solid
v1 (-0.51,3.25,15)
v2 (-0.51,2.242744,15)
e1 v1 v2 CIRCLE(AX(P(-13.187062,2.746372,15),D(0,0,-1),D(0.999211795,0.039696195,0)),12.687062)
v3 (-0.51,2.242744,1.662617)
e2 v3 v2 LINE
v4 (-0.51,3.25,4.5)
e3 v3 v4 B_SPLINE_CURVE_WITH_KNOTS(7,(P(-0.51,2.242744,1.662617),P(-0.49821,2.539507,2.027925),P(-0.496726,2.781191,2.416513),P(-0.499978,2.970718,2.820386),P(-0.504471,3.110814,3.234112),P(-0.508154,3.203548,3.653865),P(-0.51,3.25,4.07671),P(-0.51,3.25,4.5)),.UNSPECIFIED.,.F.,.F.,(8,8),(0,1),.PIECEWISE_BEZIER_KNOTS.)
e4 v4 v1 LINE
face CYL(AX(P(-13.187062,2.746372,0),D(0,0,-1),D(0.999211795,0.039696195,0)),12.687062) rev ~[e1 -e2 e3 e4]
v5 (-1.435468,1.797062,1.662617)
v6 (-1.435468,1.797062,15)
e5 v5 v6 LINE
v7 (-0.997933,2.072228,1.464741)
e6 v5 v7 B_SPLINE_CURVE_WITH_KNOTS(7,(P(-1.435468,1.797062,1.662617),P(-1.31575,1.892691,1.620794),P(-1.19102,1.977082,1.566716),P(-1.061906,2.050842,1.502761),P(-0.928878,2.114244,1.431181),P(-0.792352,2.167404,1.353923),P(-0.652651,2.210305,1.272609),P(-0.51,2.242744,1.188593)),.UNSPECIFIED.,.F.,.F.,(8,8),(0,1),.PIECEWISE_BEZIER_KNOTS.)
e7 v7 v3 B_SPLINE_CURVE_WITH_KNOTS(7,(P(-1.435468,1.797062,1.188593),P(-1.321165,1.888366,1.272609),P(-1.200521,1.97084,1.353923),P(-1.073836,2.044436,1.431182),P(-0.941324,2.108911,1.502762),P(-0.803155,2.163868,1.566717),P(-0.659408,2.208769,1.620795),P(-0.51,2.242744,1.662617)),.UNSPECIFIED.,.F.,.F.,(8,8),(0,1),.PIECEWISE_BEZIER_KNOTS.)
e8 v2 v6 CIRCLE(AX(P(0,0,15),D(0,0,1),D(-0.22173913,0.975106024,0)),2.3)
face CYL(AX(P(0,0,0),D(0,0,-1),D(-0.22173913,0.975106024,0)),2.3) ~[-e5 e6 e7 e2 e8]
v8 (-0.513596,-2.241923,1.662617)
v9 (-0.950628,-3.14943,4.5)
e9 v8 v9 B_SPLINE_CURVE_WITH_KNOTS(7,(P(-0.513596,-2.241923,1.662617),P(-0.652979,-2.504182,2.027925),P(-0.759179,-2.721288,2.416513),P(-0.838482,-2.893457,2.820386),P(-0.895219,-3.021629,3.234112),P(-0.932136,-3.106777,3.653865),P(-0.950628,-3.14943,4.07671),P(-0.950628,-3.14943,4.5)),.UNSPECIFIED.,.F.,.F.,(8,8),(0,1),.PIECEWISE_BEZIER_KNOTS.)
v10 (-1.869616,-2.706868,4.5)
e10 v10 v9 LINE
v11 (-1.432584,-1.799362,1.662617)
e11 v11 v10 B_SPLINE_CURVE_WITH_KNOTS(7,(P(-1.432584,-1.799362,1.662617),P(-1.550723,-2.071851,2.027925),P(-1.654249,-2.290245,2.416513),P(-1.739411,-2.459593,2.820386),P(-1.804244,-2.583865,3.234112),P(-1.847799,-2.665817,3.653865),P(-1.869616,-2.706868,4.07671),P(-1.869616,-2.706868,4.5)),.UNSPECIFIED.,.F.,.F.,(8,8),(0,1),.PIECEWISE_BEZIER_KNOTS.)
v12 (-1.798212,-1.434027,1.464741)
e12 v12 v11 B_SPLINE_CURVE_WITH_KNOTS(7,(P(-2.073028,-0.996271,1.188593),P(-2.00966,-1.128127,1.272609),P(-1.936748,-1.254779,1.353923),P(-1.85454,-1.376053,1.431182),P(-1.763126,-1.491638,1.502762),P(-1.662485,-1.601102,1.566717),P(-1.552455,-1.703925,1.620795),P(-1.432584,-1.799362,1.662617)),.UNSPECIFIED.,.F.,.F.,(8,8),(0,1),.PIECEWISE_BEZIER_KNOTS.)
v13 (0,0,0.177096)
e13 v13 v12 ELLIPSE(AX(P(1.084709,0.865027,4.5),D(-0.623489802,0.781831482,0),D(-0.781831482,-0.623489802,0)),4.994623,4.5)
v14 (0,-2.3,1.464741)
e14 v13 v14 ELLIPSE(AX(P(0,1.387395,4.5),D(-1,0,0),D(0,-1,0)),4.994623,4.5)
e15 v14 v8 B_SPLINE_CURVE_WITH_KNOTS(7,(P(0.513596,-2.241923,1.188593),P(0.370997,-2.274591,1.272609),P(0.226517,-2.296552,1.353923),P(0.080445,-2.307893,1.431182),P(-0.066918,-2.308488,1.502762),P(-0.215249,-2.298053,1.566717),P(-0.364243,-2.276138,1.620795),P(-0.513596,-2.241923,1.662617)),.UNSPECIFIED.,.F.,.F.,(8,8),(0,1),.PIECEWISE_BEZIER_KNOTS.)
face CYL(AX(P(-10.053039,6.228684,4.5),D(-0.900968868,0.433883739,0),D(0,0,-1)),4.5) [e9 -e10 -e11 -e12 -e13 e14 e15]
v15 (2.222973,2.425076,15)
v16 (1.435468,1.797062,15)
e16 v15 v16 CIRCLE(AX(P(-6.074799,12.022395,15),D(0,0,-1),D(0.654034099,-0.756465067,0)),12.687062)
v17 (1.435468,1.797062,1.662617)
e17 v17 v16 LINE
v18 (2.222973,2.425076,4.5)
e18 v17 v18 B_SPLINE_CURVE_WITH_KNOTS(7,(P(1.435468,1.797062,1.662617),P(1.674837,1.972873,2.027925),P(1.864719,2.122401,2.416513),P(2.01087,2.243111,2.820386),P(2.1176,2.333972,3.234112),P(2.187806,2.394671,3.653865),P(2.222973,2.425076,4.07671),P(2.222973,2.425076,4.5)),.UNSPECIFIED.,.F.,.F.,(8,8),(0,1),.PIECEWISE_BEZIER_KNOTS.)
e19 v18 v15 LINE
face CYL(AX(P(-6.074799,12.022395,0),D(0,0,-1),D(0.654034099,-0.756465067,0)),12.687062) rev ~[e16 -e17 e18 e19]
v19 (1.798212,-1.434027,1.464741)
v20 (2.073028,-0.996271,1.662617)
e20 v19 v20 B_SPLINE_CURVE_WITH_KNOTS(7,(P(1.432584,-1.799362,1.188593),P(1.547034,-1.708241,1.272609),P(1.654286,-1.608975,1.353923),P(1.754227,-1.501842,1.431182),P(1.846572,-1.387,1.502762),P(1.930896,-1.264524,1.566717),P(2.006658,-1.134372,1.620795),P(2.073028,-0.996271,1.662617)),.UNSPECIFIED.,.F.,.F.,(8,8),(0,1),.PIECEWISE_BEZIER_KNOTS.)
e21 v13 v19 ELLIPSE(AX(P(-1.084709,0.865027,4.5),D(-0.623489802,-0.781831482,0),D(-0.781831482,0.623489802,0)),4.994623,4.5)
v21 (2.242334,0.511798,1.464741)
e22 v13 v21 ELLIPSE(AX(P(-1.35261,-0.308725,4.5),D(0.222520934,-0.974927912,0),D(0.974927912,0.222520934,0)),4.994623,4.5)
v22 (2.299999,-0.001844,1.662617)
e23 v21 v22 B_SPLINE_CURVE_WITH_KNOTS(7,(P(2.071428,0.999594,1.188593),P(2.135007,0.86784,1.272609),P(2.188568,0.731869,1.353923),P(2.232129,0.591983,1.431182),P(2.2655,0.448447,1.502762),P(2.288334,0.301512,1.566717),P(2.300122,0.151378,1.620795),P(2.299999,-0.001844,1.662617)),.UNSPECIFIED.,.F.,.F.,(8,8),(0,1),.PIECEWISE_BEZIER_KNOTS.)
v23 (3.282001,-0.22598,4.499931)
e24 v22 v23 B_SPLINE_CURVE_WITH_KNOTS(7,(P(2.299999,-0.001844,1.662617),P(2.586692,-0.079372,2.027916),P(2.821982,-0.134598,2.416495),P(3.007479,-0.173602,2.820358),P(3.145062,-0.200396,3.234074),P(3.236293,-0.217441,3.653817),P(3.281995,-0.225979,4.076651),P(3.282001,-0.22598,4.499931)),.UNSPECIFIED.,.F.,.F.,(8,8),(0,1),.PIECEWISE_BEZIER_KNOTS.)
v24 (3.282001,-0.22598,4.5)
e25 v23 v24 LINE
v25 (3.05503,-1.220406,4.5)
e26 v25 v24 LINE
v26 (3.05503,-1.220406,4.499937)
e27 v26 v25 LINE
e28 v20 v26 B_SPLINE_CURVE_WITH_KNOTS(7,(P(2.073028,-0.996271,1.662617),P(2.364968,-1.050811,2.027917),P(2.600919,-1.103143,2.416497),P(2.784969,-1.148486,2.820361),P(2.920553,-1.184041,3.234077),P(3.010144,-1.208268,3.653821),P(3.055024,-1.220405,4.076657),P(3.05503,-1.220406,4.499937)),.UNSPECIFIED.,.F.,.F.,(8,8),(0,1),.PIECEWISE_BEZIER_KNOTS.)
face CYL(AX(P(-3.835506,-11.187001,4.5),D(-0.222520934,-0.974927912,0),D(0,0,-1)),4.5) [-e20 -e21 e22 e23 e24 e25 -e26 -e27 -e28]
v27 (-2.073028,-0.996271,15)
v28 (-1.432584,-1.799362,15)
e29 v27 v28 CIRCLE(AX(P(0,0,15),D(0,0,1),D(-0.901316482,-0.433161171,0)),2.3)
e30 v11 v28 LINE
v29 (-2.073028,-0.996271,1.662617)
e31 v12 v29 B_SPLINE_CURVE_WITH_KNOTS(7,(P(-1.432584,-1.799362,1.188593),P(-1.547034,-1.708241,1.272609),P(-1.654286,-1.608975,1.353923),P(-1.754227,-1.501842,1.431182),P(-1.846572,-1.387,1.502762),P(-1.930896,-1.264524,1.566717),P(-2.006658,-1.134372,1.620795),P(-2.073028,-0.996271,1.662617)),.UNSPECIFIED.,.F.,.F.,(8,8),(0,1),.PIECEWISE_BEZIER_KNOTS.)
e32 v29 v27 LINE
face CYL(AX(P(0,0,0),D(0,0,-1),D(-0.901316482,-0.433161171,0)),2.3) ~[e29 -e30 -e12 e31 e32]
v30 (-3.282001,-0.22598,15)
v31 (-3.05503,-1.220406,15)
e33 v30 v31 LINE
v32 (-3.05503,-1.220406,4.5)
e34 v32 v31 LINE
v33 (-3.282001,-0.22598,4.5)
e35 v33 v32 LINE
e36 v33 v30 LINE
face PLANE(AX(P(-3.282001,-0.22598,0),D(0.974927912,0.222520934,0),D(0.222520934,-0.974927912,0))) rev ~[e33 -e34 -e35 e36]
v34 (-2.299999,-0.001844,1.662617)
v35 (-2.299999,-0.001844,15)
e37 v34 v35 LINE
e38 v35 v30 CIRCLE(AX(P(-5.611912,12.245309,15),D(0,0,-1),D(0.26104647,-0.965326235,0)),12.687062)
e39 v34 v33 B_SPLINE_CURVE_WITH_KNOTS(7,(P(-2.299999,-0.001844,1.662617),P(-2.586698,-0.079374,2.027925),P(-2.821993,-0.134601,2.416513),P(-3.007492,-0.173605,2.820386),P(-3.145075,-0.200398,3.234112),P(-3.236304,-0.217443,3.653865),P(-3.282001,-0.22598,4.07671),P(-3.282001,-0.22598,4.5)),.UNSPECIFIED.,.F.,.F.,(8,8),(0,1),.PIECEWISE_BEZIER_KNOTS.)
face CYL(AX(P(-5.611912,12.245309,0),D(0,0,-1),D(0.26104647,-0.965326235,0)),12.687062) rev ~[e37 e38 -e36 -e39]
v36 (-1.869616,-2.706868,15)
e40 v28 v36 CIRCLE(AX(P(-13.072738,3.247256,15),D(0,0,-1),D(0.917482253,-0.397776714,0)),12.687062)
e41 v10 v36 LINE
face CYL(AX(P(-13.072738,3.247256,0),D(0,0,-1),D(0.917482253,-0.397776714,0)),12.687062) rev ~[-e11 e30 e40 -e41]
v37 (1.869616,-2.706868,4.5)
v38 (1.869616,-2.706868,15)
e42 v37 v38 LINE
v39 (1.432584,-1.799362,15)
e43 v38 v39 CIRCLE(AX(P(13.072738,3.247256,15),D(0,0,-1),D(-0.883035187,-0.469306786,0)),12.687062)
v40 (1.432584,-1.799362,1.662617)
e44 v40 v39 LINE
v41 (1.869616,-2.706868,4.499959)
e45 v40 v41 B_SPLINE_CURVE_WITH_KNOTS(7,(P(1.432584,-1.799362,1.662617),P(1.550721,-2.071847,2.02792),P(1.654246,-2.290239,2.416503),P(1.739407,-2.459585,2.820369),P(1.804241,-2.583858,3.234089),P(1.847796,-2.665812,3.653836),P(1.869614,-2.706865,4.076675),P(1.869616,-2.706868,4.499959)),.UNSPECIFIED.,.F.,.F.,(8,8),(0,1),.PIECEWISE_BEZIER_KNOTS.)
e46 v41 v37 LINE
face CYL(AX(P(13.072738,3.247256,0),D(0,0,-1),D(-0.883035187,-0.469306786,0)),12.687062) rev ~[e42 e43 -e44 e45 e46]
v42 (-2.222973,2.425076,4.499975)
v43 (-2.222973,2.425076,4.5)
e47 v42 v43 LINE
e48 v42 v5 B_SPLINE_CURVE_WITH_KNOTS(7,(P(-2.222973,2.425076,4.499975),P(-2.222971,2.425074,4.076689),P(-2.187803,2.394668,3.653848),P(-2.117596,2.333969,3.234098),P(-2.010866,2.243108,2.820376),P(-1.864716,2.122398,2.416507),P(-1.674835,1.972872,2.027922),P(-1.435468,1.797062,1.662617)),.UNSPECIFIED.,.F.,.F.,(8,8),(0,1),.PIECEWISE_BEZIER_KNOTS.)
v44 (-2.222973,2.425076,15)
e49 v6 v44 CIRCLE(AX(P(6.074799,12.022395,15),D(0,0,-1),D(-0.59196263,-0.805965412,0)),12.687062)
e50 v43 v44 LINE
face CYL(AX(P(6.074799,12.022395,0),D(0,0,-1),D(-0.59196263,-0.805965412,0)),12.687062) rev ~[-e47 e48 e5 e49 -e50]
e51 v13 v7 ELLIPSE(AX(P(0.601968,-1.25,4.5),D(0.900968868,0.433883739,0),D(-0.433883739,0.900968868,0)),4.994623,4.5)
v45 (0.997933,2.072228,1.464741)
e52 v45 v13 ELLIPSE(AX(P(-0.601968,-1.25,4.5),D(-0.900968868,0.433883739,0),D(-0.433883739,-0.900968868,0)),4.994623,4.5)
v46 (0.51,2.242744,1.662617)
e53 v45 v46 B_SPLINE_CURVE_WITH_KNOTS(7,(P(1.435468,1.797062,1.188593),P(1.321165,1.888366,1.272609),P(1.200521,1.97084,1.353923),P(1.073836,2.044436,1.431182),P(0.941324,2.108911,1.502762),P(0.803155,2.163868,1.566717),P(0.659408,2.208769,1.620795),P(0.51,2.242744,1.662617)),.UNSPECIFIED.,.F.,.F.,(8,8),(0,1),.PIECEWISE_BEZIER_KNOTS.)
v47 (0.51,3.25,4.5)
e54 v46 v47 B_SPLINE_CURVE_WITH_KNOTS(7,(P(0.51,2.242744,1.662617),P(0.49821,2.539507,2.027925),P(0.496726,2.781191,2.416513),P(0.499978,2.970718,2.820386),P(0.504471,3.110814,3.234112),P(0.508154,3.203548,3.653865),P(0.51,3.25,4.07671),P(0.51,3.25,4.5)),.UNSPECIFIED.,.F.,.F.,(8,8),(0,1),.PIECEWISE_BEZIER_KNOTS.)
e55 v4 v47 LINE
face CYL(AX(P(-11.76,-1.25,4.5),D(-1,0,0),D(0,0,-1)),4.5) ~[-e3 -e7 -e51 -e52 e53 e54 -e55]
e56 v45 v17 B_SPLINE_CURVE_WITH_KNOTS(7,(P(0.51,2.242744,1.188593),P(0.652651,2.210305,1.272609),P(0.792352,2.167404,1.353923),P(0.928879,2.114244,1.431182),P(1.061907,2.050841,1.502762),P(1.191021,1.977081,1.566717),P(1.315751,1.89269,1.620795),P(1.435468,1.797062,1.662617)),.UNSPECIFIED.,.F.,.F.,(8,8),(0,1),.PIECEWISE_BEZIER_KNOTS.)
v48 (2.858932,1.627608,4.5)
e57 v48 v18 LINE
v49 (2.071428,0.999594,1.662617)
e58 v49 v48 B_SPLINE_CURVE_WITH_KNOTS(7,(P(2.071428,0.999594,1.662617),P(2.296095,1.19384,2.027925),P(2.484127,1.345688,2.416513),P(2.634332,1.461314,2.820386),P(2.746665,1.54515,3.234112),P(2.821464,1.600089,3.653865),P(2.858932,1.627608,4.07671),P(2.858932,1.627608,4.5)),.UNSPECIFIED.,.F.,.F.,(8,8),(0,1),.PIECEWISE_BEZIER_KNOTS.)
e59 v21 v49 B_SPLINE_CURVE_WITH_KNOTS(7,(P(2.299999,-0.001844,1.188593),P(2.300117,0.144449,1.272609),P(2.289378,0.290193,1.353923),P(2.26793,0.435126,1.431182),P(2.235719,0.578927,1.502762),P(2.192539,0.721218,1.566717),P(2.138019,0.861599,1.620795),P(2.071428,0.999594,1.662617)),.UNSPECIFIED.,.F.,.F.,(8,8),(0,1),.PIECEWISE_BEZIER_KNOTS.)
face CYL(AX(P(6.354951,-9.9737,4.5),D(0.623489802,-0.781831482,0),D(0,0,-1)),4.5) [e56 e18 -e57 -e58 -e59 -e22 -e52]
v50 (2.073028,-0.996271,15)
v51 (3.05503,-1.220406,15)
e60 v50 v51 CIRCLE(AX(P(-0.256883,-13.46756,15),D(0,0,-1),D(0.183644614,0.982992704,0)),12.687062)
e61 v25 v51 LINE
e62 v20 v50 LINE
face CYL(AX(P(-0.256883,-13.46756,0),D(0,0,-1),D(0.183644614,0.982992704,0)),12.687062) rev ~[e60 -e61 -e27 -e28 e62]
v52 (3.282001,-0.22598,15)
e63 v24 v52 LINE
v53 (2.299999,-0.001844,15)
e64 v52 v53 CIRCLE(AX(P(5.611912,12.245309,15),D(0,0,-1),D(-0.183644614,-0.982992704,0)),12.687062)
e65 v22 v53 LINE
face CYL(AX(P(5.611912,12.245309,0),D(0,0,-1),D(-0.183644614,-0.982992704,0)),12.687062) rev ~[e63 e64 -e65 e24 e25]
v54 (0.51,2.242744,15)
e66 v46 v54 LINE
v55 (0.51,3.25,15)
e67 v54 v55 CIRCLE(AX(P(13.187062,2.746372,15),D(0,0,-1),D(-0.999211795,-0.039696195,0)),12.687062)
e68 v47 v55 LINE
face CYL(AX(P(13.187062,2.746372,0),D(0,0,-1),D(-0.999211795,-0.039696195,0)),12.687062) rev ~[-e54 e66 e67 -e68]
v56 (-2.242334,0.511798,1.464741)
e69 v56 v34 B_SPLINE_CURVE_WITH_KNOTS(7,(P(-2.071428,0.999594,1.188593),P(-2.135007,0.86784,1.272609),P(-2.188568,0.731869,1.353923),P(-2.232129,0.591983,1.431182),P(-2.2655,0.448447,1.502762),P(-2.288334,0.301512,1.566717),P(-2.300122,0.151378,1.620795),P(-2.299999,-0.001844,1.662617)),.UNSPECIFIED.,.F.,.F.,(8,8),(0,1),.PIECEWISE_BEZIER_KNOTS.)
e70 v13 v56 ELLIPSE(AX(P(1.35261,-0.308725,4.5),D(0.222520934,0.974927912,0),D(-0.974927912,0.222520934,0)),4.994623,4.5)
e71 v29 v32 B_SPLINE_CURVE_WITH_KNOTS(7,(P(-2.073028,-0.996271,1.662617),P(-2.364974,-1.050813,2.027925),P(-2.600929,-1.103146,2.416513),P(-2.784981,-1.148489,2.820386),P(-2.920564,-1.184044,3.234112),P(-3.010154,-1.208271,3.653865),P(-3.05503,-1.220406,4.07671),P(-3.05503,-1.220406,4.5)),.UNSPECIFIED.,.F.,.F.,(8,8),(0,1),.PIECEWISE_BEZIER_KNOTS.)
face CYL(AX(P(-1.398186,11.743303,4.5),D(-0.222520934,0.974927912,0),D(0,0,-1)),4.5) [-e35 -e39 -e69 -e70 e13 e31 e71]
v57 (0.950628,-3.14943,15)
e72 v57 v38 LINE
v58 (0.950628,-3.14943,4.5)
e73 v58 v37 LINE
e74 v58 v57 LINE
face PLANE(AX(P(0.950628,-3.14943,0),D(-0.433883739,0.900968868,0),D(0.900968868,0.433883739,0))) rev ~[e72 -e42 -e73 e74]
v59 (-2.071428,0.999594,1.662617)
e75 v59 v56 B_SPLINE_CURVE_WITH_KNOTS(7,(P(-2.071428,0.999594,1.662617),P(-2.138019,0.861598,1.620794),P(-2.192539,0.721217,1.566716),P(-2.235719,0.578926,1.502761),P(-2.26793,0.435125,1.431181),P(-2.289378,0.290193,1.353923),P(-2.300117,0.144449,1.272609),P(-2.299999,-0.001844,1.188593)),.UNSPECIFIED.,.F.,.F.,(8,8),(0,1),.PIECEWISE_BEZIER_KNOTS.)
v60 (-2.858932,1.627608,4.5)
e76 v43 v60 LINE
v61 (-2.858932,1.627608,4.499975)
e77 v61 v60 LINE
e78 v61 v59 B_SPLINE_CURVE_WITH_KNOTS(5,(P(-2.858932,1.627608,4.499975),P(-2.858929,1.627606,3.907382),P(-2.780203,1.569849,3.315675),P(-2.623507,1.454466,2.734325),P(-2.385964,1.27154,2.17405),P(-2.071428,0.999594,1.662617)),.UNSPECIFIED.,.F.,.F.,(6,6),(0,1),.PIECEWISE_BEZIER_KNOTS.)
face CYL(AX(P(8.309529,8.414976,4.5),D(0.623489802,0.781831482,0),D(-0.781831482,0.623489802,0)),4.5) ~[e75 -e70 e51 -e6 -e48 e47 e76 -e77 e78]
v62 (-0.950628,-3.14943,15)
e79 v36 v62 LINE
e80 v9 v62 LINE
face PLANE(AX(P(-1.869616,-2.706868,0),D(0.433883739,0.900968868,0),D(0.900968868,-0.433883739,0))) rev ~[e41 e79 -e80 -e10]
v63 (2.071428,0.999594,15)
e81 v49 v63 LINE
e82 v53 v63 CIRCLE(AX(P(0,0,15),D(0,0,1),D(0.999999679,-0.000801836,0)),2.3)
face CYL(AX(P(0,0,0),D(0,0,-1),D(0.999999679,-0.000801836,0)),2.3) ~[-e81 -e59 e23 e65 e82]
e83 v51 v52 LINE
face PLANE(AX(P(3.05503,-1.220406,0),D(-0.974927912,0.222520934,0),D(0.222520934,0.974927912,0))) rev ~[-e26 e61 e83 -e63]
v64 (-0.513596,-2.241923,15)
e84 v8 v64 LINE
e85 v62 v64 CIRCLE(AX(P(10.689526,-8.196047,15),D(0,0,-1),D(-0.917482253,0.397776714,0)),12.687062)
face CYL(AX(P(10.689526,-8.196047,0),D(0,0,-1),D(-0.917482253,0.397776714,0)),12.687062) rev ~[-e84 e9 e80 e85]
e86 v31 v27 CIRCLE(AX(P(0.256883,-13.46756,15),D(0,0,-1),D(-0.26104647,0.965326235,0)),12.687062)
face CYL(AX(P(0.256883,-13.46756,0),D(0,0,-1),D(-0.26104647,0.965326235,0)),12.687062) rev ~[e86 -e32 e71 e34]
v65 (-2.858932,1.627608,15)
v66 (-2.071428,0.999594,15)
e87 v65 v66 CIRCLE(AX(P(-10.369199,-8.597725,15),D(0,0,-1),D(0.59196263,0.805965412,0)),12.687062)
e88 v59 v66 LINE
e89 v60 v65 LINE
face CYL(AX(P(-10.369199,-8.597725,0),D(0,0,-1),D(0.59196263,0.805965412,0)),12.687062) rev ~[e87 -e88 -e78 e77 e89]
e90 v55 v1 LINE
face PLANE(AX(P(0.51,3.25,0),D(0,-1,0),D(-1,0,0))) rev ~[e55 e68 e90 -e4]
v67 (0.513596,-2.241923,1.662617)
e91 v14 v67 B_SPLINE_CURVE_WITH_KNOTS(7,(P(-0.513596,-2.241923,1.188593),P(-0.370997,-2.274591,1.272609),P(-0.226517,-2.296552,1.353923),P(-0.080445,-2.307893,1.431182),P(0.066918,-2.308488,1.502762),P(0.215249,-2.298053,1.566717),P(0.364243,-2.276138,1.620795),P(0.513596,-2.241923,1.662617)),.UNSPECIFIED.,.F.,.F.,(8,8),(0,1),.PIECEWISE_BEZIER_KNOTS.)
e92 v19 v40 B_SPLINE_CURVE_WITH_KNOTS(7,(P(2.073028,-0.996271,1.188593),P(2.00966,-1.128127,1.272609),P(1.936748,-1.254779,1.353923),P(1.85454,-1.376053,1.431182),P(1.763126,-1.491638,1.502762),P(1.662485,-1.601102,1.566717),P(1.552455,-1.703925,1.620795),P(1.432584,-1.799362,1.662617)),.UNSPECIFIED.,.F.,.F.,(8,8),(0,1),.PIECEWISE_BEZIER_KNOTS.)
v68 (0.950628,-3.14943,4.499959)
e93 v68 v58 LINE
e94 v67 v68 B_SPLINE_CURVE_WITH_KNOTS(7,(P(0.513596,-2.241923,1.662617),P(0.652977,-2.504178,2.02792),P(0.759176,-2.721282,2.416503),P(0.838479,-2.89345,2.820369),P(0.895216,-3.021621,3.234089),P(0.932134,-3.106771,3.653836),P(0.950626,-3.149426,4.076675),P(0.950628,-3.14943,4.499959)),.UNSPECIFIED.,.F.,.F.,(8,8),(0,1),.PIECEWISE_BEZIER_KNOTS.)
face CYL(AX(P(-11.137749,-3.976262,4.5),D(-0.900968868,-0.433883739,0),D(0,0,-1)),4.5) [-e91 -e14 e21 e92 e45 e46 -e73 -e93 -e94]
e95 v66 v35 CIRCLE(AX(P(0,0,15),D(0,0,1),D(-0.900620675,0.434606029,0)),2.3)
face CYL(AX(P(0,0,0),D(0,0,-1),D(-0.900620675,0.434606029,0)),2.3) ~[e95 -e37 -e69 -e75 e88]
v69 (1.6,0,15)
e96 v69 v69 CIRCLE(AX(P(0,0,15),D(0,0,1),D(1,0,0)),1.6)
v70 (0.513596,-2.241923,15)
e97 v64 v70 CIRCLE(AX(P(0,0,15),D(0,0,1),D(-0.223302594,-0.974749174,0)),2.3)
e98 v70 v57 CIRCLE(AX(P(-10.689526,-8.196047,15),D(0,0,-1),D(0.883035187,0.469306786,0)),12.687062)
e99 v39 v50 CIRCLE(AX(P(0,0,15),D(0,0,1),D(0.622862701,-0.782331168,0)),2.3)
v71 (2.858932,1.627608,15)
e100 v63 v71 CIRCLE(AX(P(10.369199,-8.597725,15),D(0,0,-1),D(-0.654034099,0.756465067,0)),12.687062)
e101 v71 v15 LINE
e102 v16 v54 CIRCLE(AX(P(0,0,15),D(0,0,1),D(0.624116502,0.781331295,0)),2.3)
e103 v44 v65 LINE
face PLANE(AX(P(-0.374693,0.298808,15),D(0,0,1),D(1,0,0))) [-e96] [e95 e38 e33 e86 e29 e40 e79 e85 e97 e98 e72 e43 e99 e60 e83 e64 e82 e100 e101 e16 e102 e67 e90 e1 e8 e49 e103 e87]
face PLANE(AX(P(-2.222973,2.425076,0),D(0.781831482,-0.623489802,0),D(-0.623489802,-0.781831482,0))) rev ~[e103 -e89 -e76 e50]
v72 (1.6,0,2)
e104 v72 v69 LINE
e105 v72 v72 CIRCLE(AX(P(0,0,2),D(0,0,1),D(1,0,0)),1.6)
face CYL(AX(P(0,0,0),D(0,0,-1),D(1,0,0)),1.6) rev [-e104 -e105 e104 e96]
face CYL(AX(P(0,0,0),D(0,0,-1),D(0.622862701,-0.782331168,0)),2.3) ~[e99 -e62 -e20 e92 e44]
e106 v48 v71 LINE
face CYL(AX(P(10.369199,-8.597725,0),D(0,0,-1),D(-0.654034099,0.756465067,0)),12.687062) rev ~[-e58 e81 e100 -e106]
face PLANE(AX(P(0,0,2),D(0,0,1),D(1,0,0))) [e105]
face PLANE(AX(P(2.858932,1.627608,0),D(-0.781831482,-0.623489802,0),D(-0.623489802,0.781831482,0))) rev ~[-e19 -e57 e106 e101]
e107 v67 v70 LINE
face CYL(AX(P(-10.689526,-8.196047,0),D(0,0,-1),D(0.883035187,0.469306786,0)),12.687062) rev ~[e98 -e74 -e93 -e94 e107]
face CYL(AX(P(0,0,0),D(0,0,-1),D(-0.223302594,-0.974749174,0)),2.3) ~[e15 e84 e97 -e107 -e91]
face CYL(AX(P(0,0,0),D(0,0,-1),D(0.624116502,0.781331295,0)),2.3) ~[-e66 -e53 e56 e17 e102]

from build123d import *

# Parameters (mm, degrees)
F0_R         = 1.6
F1_DEPTH     = 15
F2_DEPTH     = 2
F3_T1_DEPTH  = 23.52
F3_T3_DEPTH  = 23.52
F3_T5_DEPTH  = 23.52
F3_T7_DEPTH  = 23.52
F3_T9_DEPTH  = 23.52
F3_T11_DEPTH = 23.52
F3_T13_DEPTH = 23.52


# Not quite as in the source:
# - a fillet or chamfer that OpenCascade refuses, or shapes differently, is made with other operations: its cross-section is extruded or revolved along the edge and cut away or added


with BuildPart() as f1:
    # F0 (on Top) → F1 (new body)
    with BuildSketch(Plane.XY):
        with BuildLine():
            ThreePointArc((-2.858932117, 1.6276078), (-2.4589449365, 1.3214191477), (-2.071427552, 0.9995938658))
            ThreePointArc((-2.071427552, 0.9995938658), (-2.242334198, 0.5117981481), (-2.2999992606, -0.0018442221))
            ThreePointArc((-2.2999992606, -0.0018442221), (-2.7887751164, -0.1236612902), (-3.2820013909, -0.2259798001))
            Line((-3.2820013909, -0.2259798001), (-3.0550300383, -1.2204062706))
            ThreePointArc((-3.0550300383, -1.2204062706), (-2.5662541825, -1.0985892024), (-2.073027908, -0.9962706925))
            ThreePointArc((-2.073027908, -0.9962706925), (-1.7982124097, -1.4340265443), (-1.4325842124, -1.7993616853))
            ThreePointArc((-1.4325842124, -1.7993616853), (-1.6420905549, -2.2574537369), (-1.8696162748, -2.7068681137))
            Line((-1.8696162748, -2.7068681137), (-0.9506280295, -3.1494295276))
            ThreePointArc((-0.9506280295, -3.1494295276), (-0.741121687, -2.691337476), (-0.5135959671, -2.2419230992))
            ThreePointArc((-0.5135959671, -2.2419230992), (0, -2.3), (0.5135959671, -2.2419230992))
            ThreePointArc((0.5135959671, -2.2419230992), (0.9979326, -2.0722283962), (1.4325842124, -1.7993616853))
            ThreePointArc((1.4325842124, -1.7993616853), (1.7982124097, -1.4340265443), (2.073027908, -0.9962706925))
            ThreePointArc((2.073027908, -0.9962706925), (2.242334198, -0.5117981481), (2.2999992606, -0.0018442221))
            ThreePointArc((2.2999992606, -0.0018442221), (2.242334198, 0.5117981481), (2.071427552, 0.9995938658))
            ThreePointArc((2.071427552, 0.9995938658), (2.4589449365, 1.3214191477), (2.858932117, 1.6276078))
            Line((2.858932117, 1.6276078), (2.2229725191, 2.4250759121))
            ThreePointArc((2.2229725191, 2.4250759121), (1.8354551346, 2.1032506302), (1.4354679542, 1.797061978))
            ThreePointArc((1.4354679542, 1.797061978), (0.9979326, 2.0722283962), (0.51, 2.2427438552))
            ThreePointArc((0.51, 2.2427438552), (0.5, 2.7463719276), (0.51, 3.25))
            Line((0.51, 3.25), (-0.51, 3.25))
            ThreePointArc((-0.51, 3.25), (-0.5, 2.7463719276), (-0.51, 2.2427438552))
            ThreePointArc((-0.51, 2.2427438552), (-0.9979326, 2.0722283962), (-1.4354679542, 1.797061978))
            ThreePointArc((-1.4354679542, 1.797061978), (-1.8354551346, 2.1032506302), (-2.2229725191, 2.4250759121))
            Line((-2.2229725191, 2.4250759121), (-2.858932117, 1.6276078))
        make_face()
        Circle(F0_R, mode=Mode.SUBTRACT)
        with BuildLine():
            ThreePointArc((2.2999992606, -0.0018442221), (2.242334198, -0.5117981481), (2.073027908, -0.9962706925))
            ThreePointArc((2.073027908, -0.9962706925), (2.5662541825, -1.0985892024), (3.0550300383, -1.2204062706))
            Line((3.0550300383, -1.2204062706), (3.2820013909, -0.2259798001))
            ThreePointArc((3.2820013909, -0.2259798001), (2.7887751164, -0.1236612902), (2.2999992606, -0.0018442221))
        make_face()
        with BuildLine():
            ThreePointArc((1.4325842124, -1.7993616853), (0.9979326, -2.0722283962), (0.5135959671, -2.2419230992))
            ThreePointArc((0.5135959671, -2.2419230992), (0.741121687, -2.691337476), (0.9506280295, -3.1494295276))
            Line((0.9506280295, -3.1494295276), (1.8696162748, -2.7068681137))
            ThreePointArc((1.8696162748, -2.7068681137), (1.6420905549, -2.2574537369), (1.4325842124, -1.7993616853))
        make_face()
    extrude(amount=F1_DEPTH)

    # F0 (on Top) → F2 (join)
    with BuildSketch(Plane.XY):
        Circle(F0_R)
    extrude(amount=F2_DEPTH)

    # F3: fillet of radius 4.5 on 7 edges, made by hand

    # F3_s2 → F3_t1 (cut)
    with BuildSketch(Plane(origin=(-10.5953938865, -5.102472772, 0), x_dir=(0, 0, 1), z_dir=(0.9009688679, 0.4338837391, 0))):
        with BuildLine():
            ThreePointArc((0, -1.25), (1.3180194847, 1.9319805153), (4.5, 3.25))
            Line((4.5, 3.25), (0, 3.25))
            Line((0, 3.25), (0, -1.25))
        make_face()
    extrude(amount=F3_T1_DEPTH, mode=Mode.SUBTRACT)

    # F3_s4 → F3_t3 (cut)
    with BuildSketch(Plane(origin=(-10.5953938865, 5.102472772, 0), x_dir=(0, 0, 1), z_dir=(0.9009688679, -0.4338837391, 0))):
        with BuildLine():
            ThreePointArc((0, -1.25), (1.3180194847, 1.9319805153), (4.5, 3.25))
            Line((4.5, 3.25), (0, 3.25))
            Line((0, 3.25), (0, -1.25))
        make_face()
    extrude(amount=F3_T3_DEPTH, mode=Mode.SUBTRACT)

    # F3_s6 → F3_t5 (cut)
    with BuildSketch(Plane(origin=(-2.6168461833, 11.4651522473, 0), x_dir=(0, 0, 1), z_dir=(0.222520934, -0.9749279122, 0))):
        with BuildLine():
            ThreePointArc((0, -1.25), (1.3180194847, 1.9319805153), (4.5, 3.25))
            Line((4.5, 3.25), (0, 3.25))
            Line((0, 3.25), (0, -1.25))
        make_face()
    extrude(amount=F3_T5_DEPTH, mode=Mode.SUBTRACT)

    # F3_s8 → F3_t7 (cut)
    with BuildSketch(Plane(origin=(7.3322400699, 9.1943382338, 0), x_dir=(0, 0, 1), z_dir=(-0.6234898019, -0.7818314825, 0))):
        with BuildLine():
            ThreePointArc((4.5, 3.25), (1.3180194847, 1.9319805153), (0, -1.25))
            Line((0, -1.25), (0, 3.25))
            Line((0, 3.25), (4.5, 3.25))
        make_face()
    extrude(amount=F3_T7_DEPTH, mode=Mode.SUBTRACT)

    # F3_s10 → F3_t9 (cut)
    with BuildSketch(Plane.YZ.offset(-11.76)):
        with BuildLine():
            ThreePointArc((-1.25, 0), (1.9319805153, 1.3180194847), (3.25, 4.5))
            Line((3.25, 4.5), (3.25, 0))
            Line((3.25, 0), (-1.25, 0))
        make_face()
    extrude(amount=F3_T9_DEPTH, mode=Mode.SUBTRACT)

    # F3_s12 → F3_t11 (cut)
    with BuildSketch(Plane(origin=(7.3322400699, -9.1943382338, 0), x_dir=(0, 0, 1), z_dir=(-0.6234898019, 0.7818314825, 0))):
        with BuildLine():
            ThreePointArc((0, -1.25), (1.3180194847, 1.9319805153), (4.5, 3.25))
            Line((4.5, 3.25), (0, 3.25))
            Line((0, 3.25), (0, -1.25))
        make_face()
    extrude(amount=F3_T11_DEPTH, mode=Mode.SUBTRACT)

    # F3_s14 → F3_t13 (cut)
    with BuildSketch(Plane(origin=(-2.6168461833, -11.4651522473, 0), x_dir=(0, 0, 1), z_dir=(0.222520934, 0.9749279122, 0))):
        with BuildLine():
            ThreePointArc((0, -1.25), (1.3180194847, 1.9319805153), (4.5, 3.25))
            Line((4.5, 3.25), (0, 3.25))
            Line((0, 3.25), (0, -1.25))
        make_face()
    extrude(amount=F3_T13_DEPTH, mode=Mode.SUBTRACT)


solid = f1.part
